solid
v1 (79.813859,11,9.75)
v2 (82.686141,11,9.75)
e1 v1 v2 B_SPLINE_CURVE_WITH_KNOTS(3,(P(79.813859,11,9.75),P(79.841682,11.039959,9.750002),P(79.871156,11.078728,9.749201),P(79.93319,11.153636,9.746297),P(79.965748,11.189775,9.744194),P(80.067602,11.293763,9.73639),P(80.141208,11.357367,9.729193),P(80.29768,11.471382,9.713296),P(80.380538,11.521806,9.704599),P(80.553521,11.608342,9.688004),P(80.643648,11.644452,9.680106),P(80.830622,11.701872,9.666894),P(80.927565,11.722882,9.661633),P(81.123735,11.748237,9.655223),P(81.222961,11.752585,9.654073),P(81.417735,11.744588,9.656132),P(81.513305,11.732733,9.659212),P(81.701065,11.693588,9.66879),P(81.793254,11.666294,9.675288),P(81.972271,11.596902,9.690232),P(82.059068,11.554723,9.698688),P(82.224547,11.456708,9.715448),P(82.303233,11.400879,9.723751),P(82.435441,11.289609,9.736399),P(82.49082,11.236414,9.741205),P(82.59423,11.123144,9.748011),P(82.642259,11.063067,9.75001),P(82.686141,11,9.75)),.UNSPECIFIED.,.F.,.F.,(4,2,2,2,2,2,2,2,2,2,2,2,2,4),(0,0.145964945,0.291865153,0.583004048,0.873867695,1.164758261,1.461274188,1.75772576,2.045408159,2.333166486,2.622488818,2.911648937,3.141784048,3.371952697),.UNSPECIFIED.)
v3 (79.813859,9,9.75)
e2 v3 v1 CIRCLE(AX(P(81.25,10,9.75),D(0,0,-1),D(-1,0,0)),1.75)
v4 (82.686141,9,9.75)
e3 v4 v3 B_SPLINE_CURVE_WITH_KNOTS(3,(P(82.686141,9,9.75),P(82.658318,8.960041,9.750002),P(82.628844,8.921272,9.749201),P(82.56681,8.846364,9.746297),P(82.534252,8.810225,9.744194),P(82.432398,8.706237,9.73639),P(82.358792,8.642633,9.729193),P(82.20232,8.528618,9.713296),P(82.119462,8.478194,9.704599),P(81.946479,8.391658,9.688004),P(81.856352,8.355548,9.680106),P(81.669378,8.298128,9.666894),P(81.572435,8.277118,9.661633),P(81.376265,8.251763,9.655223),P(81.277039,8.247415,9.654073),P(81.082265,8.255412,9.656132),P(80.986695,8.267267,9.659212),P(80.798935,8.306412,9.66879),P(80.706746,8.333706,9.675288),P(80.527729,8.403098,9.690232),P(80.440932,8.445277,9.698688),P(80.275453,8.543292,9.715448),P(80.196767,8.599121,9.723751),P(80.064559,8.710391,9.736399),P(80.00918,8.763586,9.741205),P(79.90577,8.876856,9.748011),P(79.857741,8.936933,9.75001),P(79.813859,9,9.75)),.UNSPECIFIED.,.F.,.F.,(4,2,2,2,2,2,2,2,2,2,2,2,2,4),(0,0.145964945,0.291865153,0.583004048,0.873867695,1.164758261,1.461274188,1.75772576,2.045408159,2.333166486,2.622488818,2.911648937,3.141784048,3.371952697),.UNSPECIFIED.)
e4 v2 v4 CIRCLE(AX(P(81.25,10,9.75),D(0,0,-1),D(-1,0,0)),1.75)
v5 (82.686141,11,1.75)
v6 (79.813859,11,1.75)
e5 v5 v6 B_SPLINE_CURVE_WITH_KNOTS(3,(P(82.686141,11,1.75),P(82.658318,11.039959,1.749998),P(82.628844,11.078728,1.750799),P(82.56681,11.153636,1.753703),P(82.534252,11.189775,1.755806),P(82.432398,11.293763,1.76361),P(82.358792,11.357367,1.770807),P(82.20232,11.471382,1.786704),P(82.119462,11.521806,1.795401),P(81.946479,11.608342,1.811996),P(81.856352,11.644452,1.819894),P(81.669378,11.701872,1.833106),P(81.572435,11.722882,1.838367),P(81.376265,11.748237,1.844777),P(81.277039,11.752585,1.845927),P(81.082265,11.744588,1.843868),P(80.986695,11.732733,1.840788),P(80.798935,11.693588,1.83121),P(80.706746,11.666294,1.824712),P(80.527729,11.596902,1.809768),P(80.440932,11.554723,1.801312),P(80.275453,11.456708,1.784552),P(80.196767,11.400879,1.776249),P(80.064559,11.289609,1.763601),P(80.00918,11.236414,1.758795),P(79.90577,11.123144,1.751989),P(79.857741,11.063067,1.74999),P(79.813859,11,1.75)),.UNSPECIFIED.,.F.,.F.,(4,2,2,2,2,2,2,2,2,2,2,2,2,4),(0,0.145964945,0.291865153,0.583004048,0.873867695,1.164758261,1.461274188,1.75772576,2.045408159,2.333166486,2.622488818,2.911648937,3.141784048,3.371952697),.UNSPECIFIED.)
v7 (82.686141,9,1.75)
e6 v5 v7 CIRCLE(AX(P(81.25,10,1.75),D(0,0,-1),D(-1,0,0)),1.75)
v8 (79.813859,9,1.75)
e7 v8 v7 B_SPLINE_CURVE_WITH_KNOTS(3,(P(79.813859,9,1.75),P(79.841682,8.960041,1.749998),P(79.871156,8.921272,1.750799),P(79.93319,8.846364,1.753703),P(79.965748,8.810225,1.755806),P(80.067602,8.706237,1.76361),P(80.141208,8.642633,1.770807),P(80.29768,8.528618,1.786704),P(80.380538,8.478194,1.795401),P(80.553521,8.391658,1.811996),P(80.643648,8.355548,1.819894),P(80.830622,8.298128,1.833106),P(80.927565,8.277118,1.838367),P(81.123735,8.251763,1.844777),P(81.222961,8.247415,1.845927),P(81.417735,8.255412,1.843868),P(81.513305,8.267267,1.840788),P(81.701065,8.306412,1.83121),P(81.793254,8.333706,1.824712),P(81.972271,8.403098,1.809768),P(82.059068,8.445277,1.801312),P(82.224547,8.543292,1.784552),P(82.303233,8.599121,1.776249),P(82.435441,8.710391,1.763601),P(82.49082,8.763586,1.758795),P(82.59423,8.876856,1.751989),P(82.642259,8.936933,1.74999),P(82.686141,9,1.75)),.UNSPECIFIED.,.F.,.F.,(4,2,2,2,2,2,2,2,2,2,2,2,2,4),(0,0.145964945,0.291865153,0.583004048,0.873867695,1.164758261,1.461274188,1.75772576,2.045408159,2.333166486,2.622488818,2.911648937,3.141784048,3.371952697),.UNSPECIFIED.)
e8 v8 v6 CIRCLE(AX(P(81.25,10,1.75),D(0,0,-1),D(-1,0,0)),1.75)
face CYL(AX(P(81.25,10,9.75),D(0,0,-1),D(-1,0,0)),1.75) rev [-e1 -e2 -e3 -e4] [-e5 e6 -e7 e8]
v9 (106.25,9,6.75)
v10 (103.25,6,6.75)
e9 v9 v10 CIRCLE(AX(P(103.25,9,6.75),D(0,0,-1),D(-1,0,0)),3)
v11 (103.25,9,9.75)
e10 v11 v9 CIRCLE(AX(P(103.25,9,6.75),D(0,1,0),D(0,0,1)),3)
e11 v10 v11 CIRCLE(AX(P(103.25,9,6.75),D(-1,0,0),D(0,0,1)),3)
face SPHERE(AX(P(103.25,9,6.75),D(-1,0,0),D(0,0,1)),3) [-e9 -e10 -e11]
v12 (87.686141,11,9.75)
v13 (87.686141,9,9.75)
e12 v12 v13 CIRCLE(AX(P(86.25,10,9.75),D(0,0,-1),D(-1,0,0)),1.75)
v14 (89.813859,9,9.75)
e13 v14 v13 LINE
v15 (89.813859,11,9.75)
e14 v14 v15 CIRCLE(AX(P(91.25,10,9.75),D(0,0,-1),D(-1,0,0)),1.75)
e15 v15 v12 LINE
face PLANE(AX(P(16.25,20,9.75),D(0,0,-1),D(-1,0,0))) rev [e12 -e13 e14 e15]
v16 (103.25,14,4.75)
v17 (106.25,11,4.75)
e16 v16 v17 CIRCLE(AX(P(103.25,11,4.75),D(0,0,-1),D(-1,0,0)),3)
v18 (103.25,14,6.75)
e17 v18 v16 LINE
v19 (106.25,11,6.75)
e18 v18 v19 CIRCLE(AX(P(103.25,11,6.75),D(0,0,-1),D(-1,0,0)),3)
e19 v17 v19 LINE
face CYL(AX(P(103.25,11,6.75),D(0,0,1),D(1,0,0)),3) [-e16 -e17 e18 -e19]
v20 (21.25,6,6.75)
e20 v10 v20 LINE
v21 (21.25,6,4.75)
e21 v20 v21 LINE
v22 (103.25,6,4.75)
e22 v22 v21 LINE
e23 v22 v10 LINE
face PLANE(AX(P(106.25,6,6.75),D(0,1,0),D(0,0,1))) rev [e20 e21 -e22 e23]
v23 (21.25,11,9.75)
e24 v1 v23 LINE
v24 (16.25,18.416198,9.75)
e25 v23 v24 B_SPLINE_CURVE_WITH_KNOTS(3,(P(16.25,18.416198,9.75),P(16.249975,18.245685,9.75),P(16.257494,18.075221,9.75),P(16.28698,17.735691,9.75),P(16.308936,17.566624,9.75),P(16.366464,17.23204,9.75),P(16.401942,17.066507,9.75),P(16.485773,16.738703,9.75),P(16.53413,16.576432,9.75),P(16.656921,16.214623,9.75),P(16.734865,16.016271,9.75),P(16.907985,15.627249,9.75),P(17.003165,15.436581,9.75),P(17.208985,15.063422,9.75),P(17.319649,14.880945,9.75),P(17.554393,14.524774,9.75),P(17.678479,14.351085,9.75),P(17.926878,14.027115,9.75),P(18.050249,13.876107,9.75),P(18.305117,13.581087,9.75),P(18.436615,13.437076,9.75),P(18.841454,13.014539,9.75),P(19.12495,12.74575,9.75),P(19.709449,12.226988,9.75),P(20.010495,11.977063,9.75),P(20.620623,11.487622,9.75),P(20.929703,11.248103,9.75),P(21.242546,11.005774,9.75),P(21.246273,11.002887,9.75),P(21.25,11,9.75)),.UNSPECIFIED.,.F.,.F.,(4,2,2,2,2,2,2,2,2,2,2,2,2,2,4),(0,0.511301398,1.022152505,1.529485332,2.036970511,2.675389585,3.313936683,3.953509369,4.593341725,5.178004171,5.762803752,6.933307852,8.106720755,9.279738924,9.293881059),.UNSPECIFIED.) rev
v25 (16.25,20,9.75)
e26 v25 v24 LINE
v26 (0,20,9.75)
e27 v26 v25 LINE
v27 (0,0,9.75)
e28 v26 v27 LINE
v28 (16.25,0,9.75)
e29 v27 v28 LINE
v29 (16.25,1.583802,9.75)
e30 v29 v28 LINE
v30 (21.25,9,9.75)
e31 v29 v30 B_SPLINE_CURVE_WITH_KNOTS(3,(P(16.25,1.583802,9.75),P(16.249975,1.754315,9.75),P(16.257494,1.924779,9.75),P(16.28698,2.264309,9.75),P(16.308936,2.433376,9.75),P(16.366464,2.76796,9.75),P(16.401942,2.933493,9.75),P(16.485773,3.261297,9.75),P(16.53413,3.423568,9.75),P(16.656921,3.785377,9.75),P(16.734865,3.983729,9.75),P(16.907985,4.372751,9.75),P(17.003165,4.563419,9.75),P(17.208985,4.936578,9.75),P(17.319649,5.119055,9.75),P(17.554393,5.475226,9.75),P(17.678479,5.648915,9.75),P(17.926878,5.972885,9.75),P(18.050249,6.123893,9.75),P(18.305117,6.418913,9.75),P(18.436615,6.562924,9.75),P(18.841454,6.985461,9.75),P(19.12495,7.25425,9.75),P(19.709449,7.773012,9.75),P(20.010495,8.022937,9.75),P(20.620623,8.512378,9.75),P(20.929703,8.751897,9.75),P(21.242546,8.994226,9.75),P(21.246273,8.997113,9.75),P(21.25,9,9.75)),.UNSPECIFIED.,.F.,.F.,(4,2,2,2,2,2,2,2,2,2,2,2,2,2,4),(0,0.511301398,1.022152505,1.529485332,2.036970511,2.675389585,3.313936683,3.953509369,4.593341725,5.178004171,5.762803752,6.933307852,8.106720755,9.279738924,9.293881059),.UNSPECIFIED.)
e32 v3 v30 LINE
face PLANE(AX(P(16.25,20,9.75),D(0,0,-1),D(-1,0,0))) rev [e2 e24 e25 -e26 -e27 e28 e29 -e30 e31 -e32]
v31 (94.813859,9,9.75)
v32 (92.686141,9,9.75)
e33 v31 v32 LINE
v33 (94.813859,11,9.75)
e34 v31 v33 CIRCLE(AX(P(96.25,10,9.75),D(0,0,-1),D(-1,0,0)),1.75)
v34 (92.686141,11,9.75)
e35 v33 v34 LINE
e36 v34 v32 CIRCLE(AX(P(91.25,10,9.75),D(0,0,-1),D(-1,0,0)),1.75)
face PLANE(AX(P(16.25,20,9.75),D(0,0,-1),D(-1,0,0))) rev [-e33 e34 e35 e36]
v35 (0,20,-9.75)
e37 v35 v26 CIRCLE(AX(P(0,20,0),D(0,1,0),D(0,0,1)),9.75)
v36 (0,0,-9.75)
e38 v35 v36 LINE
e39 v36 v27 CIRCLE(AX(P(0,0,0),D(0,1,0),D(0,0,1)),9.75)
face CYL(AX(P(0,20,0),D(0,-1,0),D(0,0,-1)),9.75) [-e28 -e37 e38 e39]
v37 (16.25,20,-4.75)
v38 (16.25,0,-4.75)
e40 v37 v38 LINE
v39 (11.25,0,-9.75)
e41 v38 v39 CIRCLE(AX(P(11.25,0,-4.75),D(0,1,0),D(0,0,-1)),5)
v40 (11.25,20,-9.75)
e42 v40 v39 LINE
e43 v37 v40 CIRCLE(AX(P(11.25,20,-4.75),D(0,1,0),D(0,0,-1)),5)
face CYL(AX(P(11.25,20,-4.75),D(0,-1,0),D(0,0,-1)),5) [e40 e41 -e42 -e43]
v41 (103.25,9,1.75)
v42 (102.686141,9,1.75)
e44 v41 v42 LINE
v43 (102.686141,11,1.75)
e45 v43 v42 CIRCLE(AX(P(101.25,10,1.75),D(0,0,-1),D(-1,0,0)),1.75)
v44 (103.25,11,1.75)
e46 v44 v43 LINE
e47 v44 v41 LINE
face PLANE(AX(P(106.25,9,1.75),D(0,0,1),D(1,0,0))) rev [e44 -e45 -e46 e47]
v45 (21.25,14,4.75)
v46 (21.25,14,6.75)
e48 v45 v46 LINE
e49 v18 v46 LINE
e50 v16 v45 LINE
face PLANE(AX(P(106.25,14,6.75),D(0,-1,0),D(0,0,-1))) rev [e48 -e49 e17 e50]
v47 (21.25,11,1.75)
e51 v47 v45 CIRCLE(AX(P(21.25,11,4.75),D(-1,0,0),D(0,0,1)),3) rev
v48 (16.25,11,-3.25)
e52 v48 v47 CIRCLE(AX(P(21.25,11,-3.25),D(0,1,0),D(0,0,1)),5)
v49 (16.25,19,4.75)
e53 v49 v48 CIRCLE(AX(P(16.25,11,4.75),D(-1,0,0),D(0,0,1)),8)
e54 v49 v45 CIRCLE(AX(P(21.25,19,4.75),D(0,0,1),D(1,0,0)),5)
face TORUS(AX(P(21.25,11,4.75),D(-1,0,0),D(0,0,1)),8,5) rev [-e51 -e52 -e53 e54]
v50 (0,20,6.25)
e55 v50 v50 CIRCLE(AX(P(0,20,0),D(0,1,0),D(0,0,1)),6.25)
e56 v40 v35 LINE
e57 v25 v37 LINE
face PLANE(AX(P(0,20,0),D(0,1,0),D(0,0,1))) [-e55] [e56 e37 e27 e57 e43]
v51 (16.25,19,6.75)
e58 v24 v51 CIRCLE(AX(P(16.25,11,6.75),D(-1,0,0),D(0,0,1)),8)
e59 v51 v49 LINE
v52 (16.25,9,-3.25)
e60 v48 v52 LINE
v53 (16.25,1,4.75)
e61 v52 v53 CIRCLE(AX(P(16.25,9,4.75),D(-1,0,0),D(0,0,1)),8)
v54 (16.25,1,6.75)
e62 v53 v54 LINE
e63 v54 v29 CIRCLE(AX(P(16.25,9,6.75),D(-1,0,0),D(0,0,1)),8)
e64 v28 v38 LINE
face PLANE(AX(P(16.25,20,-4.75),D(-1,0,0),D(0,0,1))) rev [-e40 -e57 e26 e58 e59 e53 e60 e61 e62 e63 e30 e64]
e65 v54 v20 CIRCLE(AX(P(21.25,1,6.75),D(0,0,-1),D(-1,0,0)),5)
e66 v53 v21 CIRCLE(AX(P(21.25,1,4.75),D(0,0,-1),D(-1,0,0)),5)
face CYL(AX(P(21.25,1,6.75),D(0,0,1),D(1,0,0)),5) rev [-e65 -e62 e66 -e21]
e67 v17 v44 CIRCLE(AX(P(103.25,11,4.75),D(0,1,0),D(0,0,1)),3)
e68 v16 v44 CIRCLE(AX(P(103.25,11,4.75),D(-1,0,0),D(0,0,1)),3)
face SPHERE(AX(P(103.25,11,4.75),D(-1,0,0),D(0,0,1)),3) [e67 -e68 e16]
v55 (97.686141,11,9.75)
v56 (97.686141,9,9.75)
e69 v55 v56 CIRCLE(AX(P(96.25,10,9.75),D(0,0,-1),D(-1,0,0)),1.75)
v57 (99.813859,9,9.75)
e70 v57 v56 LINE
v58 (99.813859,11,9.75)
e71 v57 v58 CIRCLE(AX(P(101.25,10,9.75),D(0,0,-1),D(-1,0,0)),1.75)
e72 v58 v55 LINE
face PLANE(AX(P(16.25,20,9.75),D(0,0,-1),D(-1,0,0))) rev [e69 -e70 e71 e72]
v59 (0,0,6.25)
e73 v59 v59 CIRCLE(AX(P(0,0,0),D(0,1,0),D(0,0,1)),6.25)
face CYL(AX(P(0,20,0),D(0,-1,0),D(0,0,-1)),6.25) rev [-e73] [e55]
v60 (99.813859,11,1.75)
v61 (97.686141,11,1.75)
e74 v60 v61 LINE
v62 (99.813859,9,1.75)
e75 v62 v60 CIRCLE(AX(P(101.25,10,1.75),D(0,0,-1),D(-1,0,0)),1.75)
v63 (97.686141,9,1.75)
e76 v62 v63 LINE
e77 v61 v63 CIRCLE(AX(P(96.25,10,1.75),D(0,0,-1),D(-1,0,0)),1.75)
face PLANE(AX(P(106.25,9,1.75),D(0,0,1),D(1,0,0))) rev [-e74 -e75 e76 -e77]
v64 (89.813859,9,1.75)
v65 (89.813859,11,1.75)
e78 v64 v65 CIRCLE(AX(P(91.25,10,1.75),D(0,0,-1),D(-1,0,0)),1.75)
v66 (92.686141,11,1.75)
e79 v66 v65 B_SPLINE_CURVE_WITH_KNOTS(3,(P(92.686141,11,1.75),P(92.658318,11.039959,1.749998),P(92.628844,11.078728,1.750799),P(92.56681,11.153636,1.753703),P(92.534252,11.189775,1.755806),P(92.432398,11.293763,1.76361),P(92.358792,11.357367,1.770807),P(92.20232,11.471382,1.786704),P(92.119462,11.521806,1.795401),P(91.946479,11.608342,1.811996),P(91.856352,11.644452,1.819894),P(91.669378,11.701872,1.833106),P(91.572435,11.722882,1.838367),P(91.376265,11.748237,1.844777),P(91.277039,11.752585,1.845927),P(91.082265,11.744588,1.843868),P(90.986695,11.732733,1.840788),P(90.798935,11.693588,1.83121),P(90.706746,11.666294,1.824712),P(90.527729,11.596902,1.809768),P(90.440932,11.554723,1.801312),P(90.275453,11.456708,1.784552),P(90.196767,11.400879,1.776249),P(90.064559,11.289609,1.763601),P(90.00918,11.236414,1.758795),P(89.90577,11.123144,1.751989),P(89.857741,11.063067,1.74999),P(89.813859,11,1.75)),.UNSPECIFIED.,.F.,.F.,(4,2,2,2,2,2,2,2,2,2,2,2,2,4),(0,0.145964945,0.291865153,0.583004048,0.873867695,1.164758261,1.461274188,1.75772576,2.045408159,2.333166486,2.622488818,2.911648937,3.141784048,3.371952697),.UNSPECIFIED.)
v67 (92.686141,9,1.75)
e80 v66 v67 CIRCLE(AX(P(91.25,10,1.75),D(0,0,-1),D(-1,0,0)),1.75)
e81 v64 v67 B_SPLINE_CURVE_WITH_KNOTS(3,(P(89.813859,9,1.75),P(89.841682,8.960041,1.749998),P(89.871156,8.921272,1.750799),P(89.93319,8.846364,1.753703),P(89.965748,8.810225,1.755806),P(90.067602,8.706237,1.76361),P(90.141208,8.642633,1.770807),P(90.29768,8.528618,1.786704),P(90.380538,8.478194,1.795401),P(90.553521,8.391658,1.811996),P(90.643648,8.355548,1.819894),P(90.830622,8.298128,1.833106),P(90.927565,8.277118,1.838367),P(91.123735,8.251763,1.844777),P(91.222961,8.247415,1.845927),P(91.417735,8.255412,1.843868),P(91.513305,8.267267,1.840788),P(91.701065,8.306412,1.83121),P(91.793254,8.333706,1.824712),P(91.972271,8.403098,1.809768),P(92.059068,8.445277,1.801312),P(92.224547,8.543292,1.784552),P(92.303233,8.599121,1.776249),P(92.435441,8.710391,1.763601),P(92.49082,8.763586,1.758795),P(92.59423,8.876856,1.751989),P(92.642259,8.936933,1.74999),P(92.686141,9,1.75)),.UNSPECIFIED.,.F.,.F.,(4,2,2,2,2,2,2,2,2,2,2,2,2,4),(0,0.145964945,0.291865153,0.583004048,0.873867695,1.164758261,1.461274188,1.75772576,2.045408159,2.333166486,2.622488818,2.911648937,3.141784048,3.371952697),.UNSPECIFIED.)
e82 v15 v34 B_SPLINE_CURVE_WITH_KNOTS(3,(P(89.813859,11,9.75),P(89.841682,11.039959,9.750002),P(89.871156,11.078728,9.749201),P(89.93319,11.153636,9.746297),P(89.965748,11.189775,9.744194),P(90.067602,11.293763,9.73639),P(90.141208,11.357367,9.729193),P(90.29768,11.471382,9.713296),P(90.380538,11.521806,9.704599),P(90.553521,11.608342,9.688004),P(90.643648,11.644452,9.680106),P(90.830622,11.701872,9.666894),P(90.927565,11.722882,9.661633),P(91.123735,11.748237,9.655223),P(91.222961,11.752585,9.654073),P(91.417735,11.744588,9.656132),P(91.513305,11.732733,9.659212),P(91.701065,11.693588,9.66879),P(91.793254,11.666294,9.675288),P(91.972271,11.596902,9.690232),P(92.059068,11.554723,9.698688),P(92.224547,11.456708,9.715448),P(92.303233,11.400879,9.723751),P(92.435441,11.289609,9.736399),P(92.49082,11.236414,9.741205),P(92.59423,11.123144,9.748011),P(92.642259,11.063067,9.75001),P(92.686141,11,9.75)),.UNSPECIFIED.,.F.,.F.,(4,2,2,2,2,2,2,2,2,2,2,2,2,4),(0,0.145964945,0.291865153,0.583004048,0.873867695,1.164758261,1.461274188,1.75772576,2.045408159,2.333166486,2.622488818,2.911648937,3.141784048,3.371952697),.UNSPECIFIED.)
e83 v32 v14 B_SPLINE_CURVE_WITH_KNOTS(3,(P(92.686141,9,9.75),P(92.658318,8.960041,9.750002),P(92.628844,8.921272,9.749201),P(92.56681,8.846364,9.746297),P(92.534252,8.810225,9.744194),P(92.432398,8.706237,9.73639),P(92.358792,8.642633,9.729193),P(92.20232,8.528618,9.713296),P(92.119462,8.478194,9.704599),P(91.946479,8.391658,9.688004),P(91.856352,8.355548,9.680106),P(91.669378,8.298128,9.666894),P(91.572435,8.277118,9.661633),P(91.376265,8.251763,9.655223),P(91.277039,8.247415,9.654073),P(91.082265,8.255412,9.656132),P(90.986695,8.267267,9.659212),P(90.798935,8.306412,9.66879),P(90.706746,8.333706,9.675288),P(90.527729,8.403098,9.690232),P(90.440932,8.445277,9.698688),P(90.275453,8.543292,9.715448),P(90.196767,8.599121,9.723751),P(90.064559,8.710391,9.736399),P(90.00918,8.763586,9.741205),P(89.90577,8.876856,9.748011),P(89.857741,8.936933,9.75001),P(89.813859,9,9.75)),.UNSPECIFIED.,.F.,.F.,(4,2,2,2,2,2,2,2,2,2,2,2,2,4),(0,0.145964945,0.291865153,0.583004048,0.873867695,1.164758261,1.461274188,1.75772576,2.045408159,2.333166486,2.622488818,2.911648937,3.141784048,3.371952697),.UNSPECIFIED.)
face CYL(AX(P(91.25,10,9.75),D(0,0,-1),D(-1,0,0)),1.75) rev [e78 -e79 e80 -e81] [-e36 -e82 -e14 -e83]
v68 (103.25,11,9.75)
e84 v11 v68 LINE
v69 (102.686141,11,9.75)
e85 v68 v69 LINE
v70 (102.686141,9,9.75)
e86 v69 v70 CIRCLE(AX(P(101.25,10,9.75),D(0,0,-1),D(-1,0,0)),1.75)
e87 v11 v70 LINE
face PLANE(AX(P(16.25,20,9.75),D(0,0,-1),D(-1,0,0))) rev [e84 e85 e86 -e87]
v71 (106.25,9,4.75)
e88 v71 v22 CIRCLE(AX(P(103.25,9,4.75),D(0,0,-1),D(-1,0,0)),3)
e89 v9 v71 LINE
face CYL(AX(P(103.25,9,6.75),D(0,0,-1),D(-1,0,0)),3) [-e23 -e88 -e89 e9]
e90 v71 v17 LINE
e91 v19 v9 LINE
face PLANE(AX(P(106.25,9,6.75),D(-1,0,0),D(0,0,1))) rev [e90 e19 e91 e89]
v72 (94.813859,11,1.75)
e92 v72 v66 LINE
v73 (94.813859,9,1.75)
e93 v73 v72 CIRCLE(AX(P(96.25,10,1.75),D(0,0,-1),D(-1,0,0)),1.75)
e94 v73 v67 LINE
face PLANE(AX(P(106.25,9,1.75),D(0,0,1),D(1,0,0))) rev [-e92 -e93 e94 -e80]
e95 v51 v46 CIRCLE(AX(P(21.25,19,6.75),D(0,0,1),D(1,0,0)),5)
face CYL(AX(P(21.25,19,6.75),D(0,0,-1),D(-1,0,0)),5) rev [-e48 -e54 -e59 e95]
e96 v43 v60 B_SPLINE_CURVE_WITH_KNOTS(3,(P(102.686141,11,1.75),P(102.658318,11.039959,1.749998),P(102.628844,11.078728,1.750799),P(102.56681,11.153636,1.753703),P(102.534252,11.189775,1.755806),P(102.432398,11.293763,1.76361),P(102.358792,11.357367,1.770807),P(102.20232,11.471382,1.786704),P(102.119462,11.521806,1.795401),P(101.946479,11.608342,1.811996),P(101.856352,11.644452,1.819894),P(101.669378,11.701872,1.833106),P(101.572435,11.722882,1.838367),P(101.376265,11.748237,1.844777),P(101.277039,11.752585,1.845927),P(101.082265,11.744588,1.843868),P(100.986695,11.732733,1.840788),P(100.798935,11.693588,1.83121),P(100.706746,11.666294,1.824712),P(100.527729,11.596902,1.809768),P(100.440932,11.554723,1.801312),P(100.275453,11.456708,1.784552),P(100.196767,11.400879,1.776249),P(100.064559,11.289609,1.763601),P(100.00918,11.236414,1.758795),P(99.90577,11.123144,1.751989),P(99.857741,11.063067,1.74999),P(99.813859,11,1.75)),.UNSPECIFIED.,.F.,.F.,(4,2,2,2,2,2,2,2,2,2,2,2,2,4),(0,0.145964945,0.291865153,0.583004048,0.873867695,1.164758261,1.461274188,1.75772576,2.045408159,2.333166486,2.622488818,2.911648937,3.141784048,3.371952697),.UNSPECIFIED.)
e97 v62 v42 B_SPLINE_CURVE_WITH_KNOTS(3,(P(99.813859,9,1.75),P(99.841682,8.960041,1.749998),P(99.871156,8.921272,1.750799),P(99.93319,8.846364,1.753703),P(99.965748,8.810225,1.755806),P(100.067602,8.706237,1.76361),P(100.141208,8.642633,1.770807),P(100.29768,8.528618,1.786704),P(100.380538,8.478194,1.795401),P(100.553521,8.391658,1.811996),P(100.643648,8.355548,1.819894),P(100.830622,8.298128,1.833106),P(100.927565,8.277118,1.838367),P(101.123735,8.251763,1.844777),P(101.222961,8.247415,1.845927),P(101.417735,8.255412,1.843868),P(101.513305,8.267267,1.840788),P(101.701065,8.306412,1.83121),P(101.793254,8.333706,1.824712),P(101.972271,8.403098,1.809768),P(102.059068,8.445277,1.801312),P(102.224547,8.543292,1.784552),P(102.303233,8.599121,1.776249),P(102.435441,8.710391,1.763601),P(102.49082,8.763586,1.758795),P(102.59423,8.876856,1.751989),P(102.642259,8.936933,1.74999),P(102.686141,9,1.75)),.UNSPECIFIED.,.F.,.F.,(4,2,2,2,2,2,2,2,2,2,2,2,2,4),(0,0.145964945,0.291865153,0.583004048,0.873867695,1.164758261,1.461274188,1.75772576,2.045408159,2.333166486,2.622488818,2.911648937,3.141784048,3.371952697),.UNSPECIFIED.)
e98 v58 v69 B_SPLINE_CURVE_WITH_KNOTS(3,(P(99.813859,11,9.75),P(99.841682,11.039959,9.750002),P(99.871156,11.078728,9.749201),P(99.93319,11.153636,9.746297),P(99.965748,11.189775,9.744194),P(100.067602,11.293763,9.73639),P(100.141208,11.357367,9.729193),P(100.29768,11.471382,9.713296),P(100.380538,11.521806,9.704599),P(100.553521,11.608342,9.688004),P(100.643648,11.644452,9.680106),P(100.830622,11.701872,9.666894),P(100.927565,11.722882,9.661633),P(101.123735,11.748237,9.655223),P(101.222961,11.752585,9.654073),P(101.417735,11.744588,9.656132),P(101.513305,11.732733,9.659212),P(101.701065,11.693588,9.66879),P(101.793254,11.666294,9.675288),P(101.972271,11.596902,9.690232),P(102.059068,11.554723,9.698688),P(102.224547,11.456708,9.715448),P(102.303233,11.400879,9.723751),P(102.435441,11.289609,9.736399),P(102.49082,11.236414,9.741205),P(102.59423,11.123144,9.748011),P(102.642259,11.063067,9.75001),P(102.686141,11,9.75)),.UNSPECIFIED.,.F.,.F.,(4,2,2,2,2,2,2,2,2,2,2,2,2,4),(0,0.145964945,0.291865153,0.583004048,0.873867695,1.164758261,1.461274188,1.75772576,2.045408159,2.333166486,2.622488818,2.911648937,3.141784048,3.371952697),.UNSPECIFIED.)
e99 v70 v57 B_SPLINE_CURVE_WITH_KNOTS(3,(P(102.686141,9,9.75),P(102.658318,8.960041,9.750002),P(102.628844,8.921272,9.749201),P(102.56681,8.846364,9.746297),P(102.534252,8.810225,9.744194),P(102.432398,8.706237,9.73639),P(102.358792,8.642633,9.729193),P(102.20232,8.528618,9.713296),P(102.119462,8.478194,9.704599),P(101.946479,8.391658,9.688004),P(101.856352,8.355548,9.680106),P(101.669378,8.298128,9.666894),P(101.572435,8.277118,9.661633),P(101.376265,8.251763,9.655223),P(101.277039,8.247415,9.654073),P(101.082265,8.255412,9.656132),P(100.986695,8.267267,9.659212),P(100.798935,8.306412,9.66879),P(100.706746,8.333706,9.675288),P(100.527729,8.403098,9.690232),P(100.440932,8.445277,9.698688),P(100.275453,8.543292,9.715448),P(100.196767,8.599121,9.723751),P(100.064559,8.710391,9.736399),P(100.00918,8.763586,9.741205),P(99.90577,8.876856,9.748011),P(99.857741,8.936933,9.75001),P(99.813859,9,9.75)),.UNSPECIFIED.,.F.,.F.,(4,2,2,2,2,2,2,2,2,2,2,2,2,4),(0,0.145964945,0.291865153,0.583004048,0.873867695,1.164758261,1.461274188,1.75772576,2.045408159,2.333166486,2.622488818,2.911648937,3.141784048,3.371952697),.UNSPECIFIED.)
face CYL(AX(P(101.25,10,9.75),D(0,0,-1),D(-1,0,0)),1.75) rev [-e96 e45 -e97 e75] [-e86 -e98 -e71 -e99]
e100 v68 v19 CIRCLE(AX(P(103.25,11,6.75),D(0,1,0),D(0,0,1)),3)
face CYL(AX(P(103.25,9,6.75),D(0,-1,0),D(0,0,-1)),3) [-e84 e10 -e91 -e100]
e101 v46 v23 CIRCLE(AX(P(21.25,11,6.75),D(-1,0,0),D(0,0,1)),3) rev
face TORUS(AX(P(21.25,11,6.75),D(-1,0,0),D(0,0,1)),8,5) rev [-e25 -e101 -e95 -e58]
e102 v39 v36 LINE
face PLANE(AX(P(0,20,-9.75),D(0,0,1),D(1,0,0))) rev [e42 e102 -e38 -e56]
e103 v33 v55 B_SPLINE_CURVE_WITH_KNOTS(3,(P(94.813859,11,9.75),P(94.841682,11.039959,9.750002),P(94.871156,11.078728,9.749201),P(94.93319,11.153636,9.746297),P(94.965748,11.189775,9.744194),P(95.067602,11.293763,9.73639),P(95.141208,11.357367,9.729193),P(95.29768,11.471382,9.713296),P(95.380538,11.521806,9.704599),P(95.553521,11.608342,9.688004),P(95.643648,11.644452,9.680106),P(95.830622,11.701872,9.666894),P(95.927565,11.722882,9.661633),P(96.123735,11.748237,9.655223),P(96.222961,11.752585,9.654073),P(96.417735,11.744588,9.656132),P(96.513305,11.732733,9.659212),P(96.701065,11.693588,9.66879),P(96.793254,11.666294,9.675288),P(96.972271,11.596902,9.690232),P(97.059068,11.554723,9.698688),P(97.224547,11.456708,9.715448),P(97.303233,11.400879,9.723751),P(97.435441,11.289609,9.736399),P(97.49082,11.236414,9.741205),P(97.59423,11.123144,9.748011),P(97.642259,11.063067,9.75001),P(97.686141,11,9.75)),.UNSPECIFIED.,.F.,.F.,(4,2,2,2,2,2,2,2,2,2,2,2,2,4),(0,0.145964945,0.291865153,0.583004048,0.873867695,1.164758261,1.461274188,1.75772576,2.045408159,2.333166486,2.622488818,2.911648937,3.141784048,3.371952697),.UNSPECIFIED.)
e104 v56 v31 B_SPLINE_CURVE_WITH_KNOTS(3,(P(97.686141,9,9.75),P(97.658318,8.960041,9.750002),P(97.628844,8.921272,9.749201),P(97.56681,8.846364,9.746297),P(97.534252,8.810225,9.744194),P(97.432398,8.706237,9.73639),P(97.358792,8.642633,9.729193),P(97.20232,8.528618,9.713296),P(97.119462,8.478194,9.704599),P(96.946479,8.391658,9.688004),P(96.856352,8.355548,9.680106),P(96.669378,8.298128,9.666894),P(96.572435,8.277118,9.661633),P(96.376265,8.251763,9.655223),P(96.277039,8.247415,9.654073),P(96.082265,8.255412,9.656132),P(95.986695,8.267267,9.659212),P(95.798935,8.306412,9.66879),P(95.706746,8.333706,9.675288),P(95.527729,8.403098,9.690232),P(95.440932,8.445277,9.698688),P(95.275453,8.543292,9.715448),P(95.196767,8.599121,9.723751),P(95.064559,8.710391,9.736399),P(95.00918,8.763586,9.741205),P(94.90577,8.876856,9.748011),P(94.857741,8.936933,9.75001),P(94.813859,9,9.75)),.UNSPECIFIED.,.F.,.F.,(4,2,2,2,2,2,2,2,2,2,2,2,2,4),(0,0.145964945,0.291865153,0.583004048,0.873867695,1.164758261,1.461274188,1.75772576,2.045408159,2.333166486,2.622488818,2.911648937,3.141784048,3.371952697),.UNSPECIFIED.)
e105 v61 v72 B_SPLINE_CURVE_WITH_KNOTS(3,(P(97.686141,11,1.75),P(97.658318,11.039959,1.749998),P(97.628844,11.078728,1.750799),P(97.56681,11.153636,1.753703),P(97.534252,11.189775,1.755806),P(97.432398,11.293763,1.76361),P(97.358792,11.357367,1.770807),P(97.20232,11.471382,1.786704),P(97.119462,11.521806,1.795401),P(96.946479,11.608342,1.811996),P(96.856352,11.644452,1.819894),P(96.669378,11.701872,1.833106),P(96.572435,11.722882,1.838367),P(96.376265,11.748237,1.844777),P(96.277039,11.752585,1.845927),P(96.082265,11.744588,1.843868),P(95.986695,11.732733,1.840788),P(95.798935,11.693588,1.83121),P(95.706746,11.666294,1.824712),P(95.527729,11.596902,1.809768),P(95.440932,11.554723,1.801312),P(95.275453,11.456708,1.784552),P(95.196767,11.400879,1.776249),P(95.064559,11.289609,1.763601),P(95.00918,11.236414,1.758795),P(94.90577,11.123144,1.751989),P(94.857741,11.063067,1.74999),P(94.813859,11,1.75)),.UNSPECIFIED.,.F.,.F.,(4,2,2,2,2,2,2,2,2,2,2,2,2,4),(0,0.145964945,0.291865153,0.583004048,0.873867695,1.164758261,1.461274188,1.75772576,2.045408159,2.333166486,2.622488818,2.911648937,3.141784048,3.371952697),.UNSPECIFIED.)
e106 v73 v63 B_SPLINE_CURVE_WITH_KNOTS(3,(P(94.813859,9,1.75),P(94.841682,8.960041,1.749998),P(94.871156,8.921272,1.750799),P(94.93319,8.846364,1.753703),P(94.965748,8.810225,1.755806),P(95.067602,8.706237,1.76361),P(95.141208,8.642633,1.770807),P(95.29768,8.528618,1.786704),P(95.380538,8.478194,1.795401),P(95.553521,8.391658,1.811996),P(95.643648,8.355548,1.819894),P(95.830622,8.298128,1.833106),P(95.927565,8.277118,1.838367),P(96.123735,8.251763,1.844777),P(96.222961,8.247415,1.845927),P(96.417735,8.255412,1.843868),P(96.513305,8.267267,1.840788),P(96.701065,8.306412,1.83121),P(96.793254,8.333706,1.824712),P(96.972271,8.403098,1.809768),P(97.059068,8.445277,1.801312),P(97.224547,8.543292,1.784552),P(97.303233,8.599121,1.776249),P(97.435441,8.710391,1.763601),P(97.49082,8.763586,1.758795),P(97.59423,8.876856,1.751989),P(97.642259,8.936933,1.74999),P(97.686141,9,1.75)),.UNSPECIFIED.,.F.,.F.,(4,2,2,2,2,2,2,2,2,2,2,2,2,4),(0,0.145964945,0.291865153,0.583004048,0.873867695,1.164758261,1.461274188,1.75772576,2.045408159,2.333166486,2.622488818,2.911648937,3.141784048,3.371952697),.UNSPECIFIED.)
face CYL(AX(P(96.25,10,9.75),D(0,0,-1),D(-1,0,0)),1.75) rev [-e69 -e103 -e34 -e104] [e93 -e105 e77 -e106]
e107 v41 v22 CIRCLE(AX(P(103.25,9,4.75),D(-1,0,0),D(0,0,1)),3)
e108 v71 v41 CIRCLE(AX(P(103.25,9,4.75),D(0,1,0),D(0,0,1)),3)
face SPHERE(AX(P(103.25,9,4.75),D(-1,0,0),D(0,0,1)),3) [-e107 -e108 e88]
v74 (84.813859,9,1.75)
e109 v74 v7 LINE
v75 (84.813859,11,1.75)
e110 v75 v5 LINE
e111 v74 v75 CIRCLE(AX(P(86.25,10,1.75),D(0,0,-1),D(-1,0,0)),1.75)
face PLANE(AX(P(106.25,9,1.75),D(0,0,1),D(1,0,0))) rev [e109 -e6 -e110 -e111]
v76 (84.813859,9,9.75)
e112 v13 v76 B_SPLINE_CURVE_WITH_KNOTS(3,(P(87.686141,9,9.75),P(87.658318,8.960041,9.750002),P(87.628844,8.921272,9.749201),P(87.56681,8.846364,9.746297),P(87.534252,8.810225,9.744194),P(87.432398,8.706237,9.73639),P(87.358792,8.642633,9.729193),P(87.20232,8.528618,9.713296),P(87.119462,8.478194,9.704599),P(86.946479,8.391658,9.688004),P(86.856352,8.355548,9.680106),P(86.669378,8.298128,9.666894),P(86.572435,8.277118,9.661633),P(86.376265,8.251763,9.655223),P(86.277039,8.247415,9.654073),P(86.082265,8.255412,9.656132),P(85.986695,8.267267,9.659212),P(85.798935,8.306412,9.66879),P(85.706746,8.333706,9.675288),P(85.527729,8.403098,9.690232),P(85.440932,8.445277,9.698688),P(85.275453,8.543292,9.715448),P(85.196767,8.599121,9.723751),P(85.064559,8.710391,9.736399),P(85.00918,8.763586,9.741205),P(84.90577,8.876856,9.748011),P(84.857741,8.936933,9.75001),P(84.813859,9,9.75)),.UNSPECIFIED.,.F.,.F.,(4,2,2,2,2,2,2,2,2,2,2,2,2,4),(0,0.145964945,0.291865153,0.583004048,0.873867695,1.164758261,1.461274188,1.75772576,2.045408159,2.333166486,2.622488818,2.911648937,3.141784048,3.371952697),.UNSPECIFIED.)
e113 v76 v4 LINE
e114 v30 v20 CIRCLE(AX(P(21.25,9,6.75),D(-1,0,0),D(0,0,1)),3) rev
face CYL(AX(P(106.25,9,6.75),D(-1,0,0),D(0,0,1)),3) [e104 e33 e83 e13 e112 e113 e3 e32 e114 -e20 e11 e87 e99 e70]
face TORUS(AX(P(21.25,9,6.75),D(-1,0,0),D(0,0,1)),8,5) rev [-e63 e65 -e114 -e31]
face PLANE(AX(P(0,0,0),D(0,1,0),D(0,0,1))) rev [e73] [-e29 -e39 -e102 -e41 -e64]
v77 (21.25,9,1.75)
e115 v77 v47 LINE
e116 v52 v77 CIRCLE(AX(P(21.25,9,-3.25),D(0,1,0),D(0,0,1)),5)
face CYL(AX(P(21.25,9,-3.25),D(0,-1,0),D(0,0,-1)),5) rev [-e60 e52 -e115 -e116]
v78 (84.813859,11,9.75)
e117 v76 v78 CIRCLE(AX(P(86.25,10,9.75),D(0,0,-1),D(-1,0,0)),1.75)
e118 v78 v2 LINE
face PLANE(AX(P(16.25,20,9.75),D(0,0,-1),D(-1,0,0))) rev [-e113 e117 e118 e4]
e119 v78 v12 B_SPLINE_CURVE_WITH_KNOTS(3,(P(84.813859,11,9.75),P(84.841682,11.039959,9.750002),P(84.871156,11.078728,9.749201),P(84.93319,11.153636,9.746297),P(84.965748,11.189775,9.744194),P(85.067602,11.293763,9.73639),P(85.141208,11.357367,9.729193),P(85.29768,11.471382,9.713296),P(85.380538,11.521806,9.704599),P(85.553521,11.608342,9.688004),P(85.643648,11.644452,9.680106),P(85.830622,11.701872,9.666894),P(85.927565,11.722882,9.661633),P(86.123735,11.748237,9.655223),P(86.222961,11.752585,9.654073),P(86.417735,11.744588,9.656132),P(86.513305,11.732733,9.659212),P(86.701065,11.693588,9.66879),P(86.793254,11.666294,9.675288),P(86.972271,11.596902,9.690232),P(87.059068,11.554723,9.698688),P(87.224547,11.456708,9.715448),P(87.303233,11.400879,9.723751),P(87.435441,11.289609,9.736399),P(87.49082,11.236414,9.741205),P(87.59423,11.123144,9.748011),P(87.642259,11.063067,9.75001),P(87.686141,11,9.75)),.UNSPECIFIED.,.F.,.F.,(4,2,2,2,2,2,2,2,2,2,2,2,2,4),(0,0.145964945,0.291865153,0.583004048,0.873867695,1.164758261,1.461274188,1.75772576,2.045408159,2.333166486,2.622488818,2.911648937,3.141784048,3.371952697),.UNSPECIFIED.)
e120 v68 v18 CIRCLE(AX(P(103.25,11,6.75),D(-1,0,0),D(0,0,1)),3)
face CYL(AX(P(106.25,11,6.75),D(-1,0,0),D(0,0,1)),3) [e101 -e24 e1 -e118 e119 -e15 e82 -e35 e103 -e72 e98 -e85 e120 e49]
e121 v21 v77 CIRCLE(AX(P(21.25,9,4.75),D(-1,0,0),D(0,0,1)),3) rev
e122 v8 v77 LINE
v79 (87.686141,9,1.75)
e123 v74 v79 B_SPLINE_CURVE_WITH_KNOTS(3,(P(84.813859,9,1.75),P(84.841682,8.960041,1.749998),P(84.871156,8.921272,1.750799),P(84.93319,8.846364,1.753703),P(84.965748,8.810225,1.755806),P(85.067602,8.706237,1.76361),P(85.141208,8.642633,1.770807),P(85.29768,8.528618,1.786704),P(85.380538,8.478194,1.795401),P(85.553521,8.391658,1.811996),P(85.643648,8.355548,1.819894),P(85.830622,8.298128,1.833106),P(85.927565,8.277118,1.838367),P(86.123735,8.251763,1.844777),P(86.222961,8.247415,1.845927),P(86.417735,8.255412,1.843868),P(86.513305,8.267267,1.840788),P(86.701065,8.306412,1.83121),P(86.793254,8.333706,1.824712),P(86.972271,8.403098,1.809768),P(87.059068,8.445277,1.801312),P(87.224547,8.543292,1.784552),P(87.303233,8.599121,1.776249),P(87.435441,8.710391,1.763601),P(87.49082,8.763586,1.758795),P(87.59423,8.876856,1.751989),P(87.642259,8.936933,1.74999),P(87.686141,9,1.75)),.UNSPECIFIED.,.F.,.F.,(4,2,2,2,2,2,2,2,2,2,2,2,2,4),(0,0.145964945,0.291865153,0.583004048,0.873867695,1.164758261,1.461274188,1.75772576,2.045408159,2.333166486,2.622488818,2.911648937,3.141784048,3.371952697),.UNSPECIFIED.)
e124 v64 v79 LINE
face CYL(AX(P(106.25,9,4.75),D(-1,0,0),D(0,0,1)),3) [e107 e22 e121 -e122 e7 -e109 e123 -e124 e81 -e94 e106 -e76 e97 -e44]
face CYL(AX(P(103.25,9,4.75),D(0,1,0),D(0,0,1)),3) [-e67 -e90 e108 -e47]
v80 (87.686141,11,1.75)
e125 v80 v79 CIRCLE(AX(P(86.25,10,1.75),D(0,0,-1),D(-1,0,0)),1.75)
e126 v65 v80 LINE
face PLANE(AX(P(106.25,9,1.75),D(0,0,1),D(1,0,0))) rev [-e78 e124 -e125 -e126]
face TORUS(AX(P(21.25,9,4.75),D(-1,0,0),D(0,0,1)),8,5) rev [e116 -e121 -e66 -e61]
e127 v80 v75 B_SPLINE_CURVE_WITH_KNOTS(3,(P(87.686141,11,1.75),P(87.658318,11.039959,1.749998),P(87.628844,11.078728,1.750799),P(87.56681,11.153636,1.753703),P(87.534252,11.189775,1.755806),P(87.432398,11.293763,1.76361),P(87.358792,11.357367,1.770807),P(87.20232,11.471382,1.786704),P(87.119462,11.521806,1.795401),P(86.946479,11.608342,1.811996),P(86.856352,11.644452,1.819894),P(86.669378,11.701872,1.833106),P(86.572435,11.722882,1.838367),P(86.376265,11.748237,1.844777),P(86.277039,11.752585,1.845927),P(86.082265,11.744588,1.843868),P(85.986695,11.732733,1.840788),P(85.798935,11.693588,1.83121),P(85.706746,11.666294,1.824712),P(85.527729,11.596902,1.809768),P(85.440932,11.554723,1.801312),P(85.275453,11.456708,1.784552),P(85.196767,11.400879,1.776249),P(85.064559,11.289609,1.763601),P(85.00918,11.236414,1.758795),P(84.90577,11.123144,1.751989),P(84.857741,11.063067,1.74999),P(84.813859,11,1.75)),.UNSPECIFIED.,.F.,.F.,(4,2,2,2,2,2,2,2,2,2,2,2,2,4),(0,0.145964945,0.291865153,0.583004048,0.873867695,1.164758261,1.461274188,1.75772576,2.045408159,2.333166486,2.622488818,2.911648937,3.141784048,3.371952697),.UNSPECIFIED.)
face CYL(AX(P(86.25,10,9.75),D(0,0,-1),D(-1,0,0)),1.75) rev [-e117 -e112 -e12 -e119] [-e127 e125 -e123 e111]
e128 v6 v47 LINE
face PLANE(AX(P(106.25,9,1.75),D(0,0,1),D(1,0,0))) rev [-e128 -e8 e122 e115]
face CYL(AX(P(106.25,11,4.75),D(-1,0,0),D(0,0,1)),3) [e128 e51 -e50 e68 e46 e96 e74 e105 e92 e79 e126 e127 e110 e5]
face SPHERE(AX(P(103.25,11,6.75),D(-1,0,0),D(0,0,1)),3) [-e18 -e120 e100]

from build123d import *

# Parameters (mm, degrees)
SKETCH1_R           = 6.25
BOSS_EXTRUDE1_DEPTH = 20
BOSS_EXTRUDE2_DEPTH = 90
SKETCH3_R           = 1.75
CUT_EXTRUDE1_DEPTH  = 109.72585939
FILLET1_R           = 3
FILLET2_R           = 5


with BuildPart() as part:
    # Sketch1 → Boss-Extrude1 (new body)
    with BuildSketch(Plane(origin=(0, 0, 0), x_dir=(1, 0, 0), z_dir=(0, 1, 0))):
        with BuildLine():
            Line((0, 9.75), (11.25, 9.75))
            ThreePointArc((11.25, 9.75), (14.785533906, 8.285533906), (16.25, 4.75))
            Line((16.25, 4.75), (16.25, -9.75))
            Line((16.25, -9.75), (0, -9.75))
            ThreePointArc((0, -9.75), (-9.75, 0), (0, 9.75))
        make_face()
        with Locations(Location((0, 0, 0), (0, 0, 270))):
            Circle(SKETCH1_R, mode=Mode.SUBTRACT)
    extrude(amount=BOSS_EXTRUDE1_DEPTH)

    # Sketch2 → Boss-Extrude2 (add)
    with BuildSketch(Plane(origin=(16.25, 0, 0), x_dir=(0, 0, -1), z_dir=(1, 0, 0))):
        with BuildLine():
            Line((-6.75, 6), (-4.75, 6))
            ThreePointArc((-4.75, 6), (-2.628679656, 6.878679656), (-1.75, 9))
            Line((-1.75, 9), (-1.75, 11))
            ThreePointArc((-1.75, 11), (-2.628679656, 13.121320344), (-4.75, 14))
            Line((-4.75, 14), (-6.75, 14))
            ThreePointArc((-6.75, 14), (-8.871320344, 13.121320344), (-9.75, 11))
            Line((-9.75, 11), (-9.75, 9))
            ThreePointArc((-9.75, 9), (-8.871320344, 6.878679656), (-6.75, 6))
        make_face()
    extrude(amount=BOSS_EXTRUDE2_DEPTH)

    # Sketch3 → Cut-Extrude1 (cut, through all)
    with BuildSketch(Plane(origin=(0, 0, 1.75), x_dir=(-1, 0, 0), z_dir=(0, 0, -1))):
        with Locations(Location((-101.25, 10, 0), (0, 0, 34.849904579))):
            Circle(SKETCH3_R)
        with Locations(Location((-96.25, 10, 0), (0, 0, 34.849904579))):
            Circle(SKETCH3_R)
        with Locations(Location((-91.25, 10, 0), (0, 0, 34.849904579))):
            Circle(SKETCH3_R)
        with Locations(Location((-86.25, 10, 0), (0, 0, 34.849904579))):
            Circle(SKETCH3_R)
        with Locations(Location((-81.25, 10, 0), (0, 0, 34.849904579))):
            Circle(SKETCH3_R)
    extrude(amount=-CUT_EXTRUDE1_DEPTH, mode=Mode.SUBTRACT)

    # Fillet1
    fillet1_edges = [part.edges().sort_by_distance(p)[0] for p in [
        (106.25, 6.878679656, 8.871320344),
        (106.25, 6, 5.75),
        (106.25, 6.878679656, 2.628679656),
        (106.25, 10, 1.75),
        (106.25, 13.121320344, 2.628679656),
        (106.25, 14, 5.75),
        (106.25, 13.121320344, 8.871320344),
        (106.25, 10, 9.75),
    ]]
    fillet(fillet1_edges, radius=FILLET1_R)

    # Fillet2
    # the kernel refuses this fillet: 5 mm, written as the material it adds along each edge
    with BuildSketch(Plane(origin=(16.25, 9, 6.75), x_dir=(1.1842378929335002e-15, -0.8556201630305047, -0.5176042277799251), z_dir=(0, -0.5176042277799251, 0.8556201630305047))) as fillet2_piece_1_section:
        with BuildLine():
            CenterArc((-3 - FILLET2_R, FILLET2_R), FILLET2_R, 270, 90)
            Line((-3, FILLET2_R), (-3, 0))
            Line((-3, 0), (-3 - FILLET2_R, 0))
        make_face()
    fillet2_piece_1 = revolve(axis=Axis((16.25, 9, 6.75), (1, 0, 0)), revolution_arc=328.828315396, mode=Mode.PRIVATE)
    fillet2_piece_1 = split(fillet2_piece_1, bisect_by=Plane(origin=(16.92449451, 12.664519723, 9.75), z_dir=(0, 0, -1)), keep=Keep.TOP, mode=Mode.PRIVATE)
    add(fillet2_piece_1)
    with BuildSketch(Plane(origin=(16.25, 6, 6.75), x_dir=(0, -1, 0), z_dir=(0, 0, -1)), Plane(origin=(16.25, 9, 1.75), x_dir=(0, 0, -1), z_dir=(0, 1, 0))) as fillet2_piece_2:
        with BuildLine():
            CenterArc((FILLET2_R, -FILLET2_R), FILLET2_R, 90, 90)
            Line((0, -FILLET2_R), (0, 0))
            Line((0, 0), (FILLET2_R, 0))
        make_face()
    extrude(amount=2)
    with BuildSketch(Plane(origin=(16.25, 9, 4.75), x_dir=(0, -1, 0), z_dir=(0, 0, 1))) as fillet2_piece_3:
        with BuildLine():
            CenterArc((3 + FILLET2_R, FILLET2_R), FILLET2_R, 180, 90)
            Line((3, FILLET2_R), (3, 0))
            Line((3, 0), (3 + FILLET2_R, 0))
        make_face()
    revolve(axis=Axis((16.25, 9, 4.75), (1, 0, 0)), revolution_arc=90)
    with BuildSketch(Plane(origin=(16.25, 11, 4.75), x_dir=(0, 0, -1), z_dir=(0, -1, 0))) as fillet2_piece_4:
        with BuildLine():
            CenterArc((3 + FILLET2_R, FILLET2_R), FILLET2_R, 180, 90)
            Line((3, FILLET2_R), (3, 0))
            Line((3, 0), (3 + FILLET2_R, 0))
        make_face()
    revolve(axis=Axis((16.25, 11, 4.75), (1, 0, 0)), revolution_arc=90)
    with BuildSketch(Plane(origin=(16.25, 14, 4.75), x_dir=(1, 0, 0), z_dir=(0, 0, 1))) as fillet2_piece_5:
        with BuildLine():
            CenterArc((FILLET2_R, FILLET2_R), FILLET2_R, 180, 90)
            Line((0, FILLET2_R), (0, 0))
            Line((0, 0), (FILLET2_R, 0))
        make_face()
    extrude(amount=2)
    with BuildSketch(Plane(origin=(16.25, 11, 6.75), x_dir=(0, 1, 0), z_dir=(0, 0, -1))) as fillet2_piece_6_section:
        with BuildLine():
            CenterArc((3 + FILLET2_R, FILLET2_R), FILLET2_R, 180, 90)
            Line((3 + FILLET2_R, 0), (3, 0))
            Line((3, 0), (3, FILLET2_R))
        make_face()
    fillet2_piece_6 = revolve(axis=Axis((16.25, 11, 6.75), (1, 0, 0)), revolution_arc=328.828315396, mode=Mode.PRIVATE)
    fillet2_piece_6 = split(fillet2_piece_6, bisect_by=Plane(origin=(17.971658099, 13.274254424, 9.75), z_dir=(0, 0, -1)), keep=Keep.TOP, mode=Mode.PRIVATE)
    add(fillet2_piece_6)


solid = part.part
